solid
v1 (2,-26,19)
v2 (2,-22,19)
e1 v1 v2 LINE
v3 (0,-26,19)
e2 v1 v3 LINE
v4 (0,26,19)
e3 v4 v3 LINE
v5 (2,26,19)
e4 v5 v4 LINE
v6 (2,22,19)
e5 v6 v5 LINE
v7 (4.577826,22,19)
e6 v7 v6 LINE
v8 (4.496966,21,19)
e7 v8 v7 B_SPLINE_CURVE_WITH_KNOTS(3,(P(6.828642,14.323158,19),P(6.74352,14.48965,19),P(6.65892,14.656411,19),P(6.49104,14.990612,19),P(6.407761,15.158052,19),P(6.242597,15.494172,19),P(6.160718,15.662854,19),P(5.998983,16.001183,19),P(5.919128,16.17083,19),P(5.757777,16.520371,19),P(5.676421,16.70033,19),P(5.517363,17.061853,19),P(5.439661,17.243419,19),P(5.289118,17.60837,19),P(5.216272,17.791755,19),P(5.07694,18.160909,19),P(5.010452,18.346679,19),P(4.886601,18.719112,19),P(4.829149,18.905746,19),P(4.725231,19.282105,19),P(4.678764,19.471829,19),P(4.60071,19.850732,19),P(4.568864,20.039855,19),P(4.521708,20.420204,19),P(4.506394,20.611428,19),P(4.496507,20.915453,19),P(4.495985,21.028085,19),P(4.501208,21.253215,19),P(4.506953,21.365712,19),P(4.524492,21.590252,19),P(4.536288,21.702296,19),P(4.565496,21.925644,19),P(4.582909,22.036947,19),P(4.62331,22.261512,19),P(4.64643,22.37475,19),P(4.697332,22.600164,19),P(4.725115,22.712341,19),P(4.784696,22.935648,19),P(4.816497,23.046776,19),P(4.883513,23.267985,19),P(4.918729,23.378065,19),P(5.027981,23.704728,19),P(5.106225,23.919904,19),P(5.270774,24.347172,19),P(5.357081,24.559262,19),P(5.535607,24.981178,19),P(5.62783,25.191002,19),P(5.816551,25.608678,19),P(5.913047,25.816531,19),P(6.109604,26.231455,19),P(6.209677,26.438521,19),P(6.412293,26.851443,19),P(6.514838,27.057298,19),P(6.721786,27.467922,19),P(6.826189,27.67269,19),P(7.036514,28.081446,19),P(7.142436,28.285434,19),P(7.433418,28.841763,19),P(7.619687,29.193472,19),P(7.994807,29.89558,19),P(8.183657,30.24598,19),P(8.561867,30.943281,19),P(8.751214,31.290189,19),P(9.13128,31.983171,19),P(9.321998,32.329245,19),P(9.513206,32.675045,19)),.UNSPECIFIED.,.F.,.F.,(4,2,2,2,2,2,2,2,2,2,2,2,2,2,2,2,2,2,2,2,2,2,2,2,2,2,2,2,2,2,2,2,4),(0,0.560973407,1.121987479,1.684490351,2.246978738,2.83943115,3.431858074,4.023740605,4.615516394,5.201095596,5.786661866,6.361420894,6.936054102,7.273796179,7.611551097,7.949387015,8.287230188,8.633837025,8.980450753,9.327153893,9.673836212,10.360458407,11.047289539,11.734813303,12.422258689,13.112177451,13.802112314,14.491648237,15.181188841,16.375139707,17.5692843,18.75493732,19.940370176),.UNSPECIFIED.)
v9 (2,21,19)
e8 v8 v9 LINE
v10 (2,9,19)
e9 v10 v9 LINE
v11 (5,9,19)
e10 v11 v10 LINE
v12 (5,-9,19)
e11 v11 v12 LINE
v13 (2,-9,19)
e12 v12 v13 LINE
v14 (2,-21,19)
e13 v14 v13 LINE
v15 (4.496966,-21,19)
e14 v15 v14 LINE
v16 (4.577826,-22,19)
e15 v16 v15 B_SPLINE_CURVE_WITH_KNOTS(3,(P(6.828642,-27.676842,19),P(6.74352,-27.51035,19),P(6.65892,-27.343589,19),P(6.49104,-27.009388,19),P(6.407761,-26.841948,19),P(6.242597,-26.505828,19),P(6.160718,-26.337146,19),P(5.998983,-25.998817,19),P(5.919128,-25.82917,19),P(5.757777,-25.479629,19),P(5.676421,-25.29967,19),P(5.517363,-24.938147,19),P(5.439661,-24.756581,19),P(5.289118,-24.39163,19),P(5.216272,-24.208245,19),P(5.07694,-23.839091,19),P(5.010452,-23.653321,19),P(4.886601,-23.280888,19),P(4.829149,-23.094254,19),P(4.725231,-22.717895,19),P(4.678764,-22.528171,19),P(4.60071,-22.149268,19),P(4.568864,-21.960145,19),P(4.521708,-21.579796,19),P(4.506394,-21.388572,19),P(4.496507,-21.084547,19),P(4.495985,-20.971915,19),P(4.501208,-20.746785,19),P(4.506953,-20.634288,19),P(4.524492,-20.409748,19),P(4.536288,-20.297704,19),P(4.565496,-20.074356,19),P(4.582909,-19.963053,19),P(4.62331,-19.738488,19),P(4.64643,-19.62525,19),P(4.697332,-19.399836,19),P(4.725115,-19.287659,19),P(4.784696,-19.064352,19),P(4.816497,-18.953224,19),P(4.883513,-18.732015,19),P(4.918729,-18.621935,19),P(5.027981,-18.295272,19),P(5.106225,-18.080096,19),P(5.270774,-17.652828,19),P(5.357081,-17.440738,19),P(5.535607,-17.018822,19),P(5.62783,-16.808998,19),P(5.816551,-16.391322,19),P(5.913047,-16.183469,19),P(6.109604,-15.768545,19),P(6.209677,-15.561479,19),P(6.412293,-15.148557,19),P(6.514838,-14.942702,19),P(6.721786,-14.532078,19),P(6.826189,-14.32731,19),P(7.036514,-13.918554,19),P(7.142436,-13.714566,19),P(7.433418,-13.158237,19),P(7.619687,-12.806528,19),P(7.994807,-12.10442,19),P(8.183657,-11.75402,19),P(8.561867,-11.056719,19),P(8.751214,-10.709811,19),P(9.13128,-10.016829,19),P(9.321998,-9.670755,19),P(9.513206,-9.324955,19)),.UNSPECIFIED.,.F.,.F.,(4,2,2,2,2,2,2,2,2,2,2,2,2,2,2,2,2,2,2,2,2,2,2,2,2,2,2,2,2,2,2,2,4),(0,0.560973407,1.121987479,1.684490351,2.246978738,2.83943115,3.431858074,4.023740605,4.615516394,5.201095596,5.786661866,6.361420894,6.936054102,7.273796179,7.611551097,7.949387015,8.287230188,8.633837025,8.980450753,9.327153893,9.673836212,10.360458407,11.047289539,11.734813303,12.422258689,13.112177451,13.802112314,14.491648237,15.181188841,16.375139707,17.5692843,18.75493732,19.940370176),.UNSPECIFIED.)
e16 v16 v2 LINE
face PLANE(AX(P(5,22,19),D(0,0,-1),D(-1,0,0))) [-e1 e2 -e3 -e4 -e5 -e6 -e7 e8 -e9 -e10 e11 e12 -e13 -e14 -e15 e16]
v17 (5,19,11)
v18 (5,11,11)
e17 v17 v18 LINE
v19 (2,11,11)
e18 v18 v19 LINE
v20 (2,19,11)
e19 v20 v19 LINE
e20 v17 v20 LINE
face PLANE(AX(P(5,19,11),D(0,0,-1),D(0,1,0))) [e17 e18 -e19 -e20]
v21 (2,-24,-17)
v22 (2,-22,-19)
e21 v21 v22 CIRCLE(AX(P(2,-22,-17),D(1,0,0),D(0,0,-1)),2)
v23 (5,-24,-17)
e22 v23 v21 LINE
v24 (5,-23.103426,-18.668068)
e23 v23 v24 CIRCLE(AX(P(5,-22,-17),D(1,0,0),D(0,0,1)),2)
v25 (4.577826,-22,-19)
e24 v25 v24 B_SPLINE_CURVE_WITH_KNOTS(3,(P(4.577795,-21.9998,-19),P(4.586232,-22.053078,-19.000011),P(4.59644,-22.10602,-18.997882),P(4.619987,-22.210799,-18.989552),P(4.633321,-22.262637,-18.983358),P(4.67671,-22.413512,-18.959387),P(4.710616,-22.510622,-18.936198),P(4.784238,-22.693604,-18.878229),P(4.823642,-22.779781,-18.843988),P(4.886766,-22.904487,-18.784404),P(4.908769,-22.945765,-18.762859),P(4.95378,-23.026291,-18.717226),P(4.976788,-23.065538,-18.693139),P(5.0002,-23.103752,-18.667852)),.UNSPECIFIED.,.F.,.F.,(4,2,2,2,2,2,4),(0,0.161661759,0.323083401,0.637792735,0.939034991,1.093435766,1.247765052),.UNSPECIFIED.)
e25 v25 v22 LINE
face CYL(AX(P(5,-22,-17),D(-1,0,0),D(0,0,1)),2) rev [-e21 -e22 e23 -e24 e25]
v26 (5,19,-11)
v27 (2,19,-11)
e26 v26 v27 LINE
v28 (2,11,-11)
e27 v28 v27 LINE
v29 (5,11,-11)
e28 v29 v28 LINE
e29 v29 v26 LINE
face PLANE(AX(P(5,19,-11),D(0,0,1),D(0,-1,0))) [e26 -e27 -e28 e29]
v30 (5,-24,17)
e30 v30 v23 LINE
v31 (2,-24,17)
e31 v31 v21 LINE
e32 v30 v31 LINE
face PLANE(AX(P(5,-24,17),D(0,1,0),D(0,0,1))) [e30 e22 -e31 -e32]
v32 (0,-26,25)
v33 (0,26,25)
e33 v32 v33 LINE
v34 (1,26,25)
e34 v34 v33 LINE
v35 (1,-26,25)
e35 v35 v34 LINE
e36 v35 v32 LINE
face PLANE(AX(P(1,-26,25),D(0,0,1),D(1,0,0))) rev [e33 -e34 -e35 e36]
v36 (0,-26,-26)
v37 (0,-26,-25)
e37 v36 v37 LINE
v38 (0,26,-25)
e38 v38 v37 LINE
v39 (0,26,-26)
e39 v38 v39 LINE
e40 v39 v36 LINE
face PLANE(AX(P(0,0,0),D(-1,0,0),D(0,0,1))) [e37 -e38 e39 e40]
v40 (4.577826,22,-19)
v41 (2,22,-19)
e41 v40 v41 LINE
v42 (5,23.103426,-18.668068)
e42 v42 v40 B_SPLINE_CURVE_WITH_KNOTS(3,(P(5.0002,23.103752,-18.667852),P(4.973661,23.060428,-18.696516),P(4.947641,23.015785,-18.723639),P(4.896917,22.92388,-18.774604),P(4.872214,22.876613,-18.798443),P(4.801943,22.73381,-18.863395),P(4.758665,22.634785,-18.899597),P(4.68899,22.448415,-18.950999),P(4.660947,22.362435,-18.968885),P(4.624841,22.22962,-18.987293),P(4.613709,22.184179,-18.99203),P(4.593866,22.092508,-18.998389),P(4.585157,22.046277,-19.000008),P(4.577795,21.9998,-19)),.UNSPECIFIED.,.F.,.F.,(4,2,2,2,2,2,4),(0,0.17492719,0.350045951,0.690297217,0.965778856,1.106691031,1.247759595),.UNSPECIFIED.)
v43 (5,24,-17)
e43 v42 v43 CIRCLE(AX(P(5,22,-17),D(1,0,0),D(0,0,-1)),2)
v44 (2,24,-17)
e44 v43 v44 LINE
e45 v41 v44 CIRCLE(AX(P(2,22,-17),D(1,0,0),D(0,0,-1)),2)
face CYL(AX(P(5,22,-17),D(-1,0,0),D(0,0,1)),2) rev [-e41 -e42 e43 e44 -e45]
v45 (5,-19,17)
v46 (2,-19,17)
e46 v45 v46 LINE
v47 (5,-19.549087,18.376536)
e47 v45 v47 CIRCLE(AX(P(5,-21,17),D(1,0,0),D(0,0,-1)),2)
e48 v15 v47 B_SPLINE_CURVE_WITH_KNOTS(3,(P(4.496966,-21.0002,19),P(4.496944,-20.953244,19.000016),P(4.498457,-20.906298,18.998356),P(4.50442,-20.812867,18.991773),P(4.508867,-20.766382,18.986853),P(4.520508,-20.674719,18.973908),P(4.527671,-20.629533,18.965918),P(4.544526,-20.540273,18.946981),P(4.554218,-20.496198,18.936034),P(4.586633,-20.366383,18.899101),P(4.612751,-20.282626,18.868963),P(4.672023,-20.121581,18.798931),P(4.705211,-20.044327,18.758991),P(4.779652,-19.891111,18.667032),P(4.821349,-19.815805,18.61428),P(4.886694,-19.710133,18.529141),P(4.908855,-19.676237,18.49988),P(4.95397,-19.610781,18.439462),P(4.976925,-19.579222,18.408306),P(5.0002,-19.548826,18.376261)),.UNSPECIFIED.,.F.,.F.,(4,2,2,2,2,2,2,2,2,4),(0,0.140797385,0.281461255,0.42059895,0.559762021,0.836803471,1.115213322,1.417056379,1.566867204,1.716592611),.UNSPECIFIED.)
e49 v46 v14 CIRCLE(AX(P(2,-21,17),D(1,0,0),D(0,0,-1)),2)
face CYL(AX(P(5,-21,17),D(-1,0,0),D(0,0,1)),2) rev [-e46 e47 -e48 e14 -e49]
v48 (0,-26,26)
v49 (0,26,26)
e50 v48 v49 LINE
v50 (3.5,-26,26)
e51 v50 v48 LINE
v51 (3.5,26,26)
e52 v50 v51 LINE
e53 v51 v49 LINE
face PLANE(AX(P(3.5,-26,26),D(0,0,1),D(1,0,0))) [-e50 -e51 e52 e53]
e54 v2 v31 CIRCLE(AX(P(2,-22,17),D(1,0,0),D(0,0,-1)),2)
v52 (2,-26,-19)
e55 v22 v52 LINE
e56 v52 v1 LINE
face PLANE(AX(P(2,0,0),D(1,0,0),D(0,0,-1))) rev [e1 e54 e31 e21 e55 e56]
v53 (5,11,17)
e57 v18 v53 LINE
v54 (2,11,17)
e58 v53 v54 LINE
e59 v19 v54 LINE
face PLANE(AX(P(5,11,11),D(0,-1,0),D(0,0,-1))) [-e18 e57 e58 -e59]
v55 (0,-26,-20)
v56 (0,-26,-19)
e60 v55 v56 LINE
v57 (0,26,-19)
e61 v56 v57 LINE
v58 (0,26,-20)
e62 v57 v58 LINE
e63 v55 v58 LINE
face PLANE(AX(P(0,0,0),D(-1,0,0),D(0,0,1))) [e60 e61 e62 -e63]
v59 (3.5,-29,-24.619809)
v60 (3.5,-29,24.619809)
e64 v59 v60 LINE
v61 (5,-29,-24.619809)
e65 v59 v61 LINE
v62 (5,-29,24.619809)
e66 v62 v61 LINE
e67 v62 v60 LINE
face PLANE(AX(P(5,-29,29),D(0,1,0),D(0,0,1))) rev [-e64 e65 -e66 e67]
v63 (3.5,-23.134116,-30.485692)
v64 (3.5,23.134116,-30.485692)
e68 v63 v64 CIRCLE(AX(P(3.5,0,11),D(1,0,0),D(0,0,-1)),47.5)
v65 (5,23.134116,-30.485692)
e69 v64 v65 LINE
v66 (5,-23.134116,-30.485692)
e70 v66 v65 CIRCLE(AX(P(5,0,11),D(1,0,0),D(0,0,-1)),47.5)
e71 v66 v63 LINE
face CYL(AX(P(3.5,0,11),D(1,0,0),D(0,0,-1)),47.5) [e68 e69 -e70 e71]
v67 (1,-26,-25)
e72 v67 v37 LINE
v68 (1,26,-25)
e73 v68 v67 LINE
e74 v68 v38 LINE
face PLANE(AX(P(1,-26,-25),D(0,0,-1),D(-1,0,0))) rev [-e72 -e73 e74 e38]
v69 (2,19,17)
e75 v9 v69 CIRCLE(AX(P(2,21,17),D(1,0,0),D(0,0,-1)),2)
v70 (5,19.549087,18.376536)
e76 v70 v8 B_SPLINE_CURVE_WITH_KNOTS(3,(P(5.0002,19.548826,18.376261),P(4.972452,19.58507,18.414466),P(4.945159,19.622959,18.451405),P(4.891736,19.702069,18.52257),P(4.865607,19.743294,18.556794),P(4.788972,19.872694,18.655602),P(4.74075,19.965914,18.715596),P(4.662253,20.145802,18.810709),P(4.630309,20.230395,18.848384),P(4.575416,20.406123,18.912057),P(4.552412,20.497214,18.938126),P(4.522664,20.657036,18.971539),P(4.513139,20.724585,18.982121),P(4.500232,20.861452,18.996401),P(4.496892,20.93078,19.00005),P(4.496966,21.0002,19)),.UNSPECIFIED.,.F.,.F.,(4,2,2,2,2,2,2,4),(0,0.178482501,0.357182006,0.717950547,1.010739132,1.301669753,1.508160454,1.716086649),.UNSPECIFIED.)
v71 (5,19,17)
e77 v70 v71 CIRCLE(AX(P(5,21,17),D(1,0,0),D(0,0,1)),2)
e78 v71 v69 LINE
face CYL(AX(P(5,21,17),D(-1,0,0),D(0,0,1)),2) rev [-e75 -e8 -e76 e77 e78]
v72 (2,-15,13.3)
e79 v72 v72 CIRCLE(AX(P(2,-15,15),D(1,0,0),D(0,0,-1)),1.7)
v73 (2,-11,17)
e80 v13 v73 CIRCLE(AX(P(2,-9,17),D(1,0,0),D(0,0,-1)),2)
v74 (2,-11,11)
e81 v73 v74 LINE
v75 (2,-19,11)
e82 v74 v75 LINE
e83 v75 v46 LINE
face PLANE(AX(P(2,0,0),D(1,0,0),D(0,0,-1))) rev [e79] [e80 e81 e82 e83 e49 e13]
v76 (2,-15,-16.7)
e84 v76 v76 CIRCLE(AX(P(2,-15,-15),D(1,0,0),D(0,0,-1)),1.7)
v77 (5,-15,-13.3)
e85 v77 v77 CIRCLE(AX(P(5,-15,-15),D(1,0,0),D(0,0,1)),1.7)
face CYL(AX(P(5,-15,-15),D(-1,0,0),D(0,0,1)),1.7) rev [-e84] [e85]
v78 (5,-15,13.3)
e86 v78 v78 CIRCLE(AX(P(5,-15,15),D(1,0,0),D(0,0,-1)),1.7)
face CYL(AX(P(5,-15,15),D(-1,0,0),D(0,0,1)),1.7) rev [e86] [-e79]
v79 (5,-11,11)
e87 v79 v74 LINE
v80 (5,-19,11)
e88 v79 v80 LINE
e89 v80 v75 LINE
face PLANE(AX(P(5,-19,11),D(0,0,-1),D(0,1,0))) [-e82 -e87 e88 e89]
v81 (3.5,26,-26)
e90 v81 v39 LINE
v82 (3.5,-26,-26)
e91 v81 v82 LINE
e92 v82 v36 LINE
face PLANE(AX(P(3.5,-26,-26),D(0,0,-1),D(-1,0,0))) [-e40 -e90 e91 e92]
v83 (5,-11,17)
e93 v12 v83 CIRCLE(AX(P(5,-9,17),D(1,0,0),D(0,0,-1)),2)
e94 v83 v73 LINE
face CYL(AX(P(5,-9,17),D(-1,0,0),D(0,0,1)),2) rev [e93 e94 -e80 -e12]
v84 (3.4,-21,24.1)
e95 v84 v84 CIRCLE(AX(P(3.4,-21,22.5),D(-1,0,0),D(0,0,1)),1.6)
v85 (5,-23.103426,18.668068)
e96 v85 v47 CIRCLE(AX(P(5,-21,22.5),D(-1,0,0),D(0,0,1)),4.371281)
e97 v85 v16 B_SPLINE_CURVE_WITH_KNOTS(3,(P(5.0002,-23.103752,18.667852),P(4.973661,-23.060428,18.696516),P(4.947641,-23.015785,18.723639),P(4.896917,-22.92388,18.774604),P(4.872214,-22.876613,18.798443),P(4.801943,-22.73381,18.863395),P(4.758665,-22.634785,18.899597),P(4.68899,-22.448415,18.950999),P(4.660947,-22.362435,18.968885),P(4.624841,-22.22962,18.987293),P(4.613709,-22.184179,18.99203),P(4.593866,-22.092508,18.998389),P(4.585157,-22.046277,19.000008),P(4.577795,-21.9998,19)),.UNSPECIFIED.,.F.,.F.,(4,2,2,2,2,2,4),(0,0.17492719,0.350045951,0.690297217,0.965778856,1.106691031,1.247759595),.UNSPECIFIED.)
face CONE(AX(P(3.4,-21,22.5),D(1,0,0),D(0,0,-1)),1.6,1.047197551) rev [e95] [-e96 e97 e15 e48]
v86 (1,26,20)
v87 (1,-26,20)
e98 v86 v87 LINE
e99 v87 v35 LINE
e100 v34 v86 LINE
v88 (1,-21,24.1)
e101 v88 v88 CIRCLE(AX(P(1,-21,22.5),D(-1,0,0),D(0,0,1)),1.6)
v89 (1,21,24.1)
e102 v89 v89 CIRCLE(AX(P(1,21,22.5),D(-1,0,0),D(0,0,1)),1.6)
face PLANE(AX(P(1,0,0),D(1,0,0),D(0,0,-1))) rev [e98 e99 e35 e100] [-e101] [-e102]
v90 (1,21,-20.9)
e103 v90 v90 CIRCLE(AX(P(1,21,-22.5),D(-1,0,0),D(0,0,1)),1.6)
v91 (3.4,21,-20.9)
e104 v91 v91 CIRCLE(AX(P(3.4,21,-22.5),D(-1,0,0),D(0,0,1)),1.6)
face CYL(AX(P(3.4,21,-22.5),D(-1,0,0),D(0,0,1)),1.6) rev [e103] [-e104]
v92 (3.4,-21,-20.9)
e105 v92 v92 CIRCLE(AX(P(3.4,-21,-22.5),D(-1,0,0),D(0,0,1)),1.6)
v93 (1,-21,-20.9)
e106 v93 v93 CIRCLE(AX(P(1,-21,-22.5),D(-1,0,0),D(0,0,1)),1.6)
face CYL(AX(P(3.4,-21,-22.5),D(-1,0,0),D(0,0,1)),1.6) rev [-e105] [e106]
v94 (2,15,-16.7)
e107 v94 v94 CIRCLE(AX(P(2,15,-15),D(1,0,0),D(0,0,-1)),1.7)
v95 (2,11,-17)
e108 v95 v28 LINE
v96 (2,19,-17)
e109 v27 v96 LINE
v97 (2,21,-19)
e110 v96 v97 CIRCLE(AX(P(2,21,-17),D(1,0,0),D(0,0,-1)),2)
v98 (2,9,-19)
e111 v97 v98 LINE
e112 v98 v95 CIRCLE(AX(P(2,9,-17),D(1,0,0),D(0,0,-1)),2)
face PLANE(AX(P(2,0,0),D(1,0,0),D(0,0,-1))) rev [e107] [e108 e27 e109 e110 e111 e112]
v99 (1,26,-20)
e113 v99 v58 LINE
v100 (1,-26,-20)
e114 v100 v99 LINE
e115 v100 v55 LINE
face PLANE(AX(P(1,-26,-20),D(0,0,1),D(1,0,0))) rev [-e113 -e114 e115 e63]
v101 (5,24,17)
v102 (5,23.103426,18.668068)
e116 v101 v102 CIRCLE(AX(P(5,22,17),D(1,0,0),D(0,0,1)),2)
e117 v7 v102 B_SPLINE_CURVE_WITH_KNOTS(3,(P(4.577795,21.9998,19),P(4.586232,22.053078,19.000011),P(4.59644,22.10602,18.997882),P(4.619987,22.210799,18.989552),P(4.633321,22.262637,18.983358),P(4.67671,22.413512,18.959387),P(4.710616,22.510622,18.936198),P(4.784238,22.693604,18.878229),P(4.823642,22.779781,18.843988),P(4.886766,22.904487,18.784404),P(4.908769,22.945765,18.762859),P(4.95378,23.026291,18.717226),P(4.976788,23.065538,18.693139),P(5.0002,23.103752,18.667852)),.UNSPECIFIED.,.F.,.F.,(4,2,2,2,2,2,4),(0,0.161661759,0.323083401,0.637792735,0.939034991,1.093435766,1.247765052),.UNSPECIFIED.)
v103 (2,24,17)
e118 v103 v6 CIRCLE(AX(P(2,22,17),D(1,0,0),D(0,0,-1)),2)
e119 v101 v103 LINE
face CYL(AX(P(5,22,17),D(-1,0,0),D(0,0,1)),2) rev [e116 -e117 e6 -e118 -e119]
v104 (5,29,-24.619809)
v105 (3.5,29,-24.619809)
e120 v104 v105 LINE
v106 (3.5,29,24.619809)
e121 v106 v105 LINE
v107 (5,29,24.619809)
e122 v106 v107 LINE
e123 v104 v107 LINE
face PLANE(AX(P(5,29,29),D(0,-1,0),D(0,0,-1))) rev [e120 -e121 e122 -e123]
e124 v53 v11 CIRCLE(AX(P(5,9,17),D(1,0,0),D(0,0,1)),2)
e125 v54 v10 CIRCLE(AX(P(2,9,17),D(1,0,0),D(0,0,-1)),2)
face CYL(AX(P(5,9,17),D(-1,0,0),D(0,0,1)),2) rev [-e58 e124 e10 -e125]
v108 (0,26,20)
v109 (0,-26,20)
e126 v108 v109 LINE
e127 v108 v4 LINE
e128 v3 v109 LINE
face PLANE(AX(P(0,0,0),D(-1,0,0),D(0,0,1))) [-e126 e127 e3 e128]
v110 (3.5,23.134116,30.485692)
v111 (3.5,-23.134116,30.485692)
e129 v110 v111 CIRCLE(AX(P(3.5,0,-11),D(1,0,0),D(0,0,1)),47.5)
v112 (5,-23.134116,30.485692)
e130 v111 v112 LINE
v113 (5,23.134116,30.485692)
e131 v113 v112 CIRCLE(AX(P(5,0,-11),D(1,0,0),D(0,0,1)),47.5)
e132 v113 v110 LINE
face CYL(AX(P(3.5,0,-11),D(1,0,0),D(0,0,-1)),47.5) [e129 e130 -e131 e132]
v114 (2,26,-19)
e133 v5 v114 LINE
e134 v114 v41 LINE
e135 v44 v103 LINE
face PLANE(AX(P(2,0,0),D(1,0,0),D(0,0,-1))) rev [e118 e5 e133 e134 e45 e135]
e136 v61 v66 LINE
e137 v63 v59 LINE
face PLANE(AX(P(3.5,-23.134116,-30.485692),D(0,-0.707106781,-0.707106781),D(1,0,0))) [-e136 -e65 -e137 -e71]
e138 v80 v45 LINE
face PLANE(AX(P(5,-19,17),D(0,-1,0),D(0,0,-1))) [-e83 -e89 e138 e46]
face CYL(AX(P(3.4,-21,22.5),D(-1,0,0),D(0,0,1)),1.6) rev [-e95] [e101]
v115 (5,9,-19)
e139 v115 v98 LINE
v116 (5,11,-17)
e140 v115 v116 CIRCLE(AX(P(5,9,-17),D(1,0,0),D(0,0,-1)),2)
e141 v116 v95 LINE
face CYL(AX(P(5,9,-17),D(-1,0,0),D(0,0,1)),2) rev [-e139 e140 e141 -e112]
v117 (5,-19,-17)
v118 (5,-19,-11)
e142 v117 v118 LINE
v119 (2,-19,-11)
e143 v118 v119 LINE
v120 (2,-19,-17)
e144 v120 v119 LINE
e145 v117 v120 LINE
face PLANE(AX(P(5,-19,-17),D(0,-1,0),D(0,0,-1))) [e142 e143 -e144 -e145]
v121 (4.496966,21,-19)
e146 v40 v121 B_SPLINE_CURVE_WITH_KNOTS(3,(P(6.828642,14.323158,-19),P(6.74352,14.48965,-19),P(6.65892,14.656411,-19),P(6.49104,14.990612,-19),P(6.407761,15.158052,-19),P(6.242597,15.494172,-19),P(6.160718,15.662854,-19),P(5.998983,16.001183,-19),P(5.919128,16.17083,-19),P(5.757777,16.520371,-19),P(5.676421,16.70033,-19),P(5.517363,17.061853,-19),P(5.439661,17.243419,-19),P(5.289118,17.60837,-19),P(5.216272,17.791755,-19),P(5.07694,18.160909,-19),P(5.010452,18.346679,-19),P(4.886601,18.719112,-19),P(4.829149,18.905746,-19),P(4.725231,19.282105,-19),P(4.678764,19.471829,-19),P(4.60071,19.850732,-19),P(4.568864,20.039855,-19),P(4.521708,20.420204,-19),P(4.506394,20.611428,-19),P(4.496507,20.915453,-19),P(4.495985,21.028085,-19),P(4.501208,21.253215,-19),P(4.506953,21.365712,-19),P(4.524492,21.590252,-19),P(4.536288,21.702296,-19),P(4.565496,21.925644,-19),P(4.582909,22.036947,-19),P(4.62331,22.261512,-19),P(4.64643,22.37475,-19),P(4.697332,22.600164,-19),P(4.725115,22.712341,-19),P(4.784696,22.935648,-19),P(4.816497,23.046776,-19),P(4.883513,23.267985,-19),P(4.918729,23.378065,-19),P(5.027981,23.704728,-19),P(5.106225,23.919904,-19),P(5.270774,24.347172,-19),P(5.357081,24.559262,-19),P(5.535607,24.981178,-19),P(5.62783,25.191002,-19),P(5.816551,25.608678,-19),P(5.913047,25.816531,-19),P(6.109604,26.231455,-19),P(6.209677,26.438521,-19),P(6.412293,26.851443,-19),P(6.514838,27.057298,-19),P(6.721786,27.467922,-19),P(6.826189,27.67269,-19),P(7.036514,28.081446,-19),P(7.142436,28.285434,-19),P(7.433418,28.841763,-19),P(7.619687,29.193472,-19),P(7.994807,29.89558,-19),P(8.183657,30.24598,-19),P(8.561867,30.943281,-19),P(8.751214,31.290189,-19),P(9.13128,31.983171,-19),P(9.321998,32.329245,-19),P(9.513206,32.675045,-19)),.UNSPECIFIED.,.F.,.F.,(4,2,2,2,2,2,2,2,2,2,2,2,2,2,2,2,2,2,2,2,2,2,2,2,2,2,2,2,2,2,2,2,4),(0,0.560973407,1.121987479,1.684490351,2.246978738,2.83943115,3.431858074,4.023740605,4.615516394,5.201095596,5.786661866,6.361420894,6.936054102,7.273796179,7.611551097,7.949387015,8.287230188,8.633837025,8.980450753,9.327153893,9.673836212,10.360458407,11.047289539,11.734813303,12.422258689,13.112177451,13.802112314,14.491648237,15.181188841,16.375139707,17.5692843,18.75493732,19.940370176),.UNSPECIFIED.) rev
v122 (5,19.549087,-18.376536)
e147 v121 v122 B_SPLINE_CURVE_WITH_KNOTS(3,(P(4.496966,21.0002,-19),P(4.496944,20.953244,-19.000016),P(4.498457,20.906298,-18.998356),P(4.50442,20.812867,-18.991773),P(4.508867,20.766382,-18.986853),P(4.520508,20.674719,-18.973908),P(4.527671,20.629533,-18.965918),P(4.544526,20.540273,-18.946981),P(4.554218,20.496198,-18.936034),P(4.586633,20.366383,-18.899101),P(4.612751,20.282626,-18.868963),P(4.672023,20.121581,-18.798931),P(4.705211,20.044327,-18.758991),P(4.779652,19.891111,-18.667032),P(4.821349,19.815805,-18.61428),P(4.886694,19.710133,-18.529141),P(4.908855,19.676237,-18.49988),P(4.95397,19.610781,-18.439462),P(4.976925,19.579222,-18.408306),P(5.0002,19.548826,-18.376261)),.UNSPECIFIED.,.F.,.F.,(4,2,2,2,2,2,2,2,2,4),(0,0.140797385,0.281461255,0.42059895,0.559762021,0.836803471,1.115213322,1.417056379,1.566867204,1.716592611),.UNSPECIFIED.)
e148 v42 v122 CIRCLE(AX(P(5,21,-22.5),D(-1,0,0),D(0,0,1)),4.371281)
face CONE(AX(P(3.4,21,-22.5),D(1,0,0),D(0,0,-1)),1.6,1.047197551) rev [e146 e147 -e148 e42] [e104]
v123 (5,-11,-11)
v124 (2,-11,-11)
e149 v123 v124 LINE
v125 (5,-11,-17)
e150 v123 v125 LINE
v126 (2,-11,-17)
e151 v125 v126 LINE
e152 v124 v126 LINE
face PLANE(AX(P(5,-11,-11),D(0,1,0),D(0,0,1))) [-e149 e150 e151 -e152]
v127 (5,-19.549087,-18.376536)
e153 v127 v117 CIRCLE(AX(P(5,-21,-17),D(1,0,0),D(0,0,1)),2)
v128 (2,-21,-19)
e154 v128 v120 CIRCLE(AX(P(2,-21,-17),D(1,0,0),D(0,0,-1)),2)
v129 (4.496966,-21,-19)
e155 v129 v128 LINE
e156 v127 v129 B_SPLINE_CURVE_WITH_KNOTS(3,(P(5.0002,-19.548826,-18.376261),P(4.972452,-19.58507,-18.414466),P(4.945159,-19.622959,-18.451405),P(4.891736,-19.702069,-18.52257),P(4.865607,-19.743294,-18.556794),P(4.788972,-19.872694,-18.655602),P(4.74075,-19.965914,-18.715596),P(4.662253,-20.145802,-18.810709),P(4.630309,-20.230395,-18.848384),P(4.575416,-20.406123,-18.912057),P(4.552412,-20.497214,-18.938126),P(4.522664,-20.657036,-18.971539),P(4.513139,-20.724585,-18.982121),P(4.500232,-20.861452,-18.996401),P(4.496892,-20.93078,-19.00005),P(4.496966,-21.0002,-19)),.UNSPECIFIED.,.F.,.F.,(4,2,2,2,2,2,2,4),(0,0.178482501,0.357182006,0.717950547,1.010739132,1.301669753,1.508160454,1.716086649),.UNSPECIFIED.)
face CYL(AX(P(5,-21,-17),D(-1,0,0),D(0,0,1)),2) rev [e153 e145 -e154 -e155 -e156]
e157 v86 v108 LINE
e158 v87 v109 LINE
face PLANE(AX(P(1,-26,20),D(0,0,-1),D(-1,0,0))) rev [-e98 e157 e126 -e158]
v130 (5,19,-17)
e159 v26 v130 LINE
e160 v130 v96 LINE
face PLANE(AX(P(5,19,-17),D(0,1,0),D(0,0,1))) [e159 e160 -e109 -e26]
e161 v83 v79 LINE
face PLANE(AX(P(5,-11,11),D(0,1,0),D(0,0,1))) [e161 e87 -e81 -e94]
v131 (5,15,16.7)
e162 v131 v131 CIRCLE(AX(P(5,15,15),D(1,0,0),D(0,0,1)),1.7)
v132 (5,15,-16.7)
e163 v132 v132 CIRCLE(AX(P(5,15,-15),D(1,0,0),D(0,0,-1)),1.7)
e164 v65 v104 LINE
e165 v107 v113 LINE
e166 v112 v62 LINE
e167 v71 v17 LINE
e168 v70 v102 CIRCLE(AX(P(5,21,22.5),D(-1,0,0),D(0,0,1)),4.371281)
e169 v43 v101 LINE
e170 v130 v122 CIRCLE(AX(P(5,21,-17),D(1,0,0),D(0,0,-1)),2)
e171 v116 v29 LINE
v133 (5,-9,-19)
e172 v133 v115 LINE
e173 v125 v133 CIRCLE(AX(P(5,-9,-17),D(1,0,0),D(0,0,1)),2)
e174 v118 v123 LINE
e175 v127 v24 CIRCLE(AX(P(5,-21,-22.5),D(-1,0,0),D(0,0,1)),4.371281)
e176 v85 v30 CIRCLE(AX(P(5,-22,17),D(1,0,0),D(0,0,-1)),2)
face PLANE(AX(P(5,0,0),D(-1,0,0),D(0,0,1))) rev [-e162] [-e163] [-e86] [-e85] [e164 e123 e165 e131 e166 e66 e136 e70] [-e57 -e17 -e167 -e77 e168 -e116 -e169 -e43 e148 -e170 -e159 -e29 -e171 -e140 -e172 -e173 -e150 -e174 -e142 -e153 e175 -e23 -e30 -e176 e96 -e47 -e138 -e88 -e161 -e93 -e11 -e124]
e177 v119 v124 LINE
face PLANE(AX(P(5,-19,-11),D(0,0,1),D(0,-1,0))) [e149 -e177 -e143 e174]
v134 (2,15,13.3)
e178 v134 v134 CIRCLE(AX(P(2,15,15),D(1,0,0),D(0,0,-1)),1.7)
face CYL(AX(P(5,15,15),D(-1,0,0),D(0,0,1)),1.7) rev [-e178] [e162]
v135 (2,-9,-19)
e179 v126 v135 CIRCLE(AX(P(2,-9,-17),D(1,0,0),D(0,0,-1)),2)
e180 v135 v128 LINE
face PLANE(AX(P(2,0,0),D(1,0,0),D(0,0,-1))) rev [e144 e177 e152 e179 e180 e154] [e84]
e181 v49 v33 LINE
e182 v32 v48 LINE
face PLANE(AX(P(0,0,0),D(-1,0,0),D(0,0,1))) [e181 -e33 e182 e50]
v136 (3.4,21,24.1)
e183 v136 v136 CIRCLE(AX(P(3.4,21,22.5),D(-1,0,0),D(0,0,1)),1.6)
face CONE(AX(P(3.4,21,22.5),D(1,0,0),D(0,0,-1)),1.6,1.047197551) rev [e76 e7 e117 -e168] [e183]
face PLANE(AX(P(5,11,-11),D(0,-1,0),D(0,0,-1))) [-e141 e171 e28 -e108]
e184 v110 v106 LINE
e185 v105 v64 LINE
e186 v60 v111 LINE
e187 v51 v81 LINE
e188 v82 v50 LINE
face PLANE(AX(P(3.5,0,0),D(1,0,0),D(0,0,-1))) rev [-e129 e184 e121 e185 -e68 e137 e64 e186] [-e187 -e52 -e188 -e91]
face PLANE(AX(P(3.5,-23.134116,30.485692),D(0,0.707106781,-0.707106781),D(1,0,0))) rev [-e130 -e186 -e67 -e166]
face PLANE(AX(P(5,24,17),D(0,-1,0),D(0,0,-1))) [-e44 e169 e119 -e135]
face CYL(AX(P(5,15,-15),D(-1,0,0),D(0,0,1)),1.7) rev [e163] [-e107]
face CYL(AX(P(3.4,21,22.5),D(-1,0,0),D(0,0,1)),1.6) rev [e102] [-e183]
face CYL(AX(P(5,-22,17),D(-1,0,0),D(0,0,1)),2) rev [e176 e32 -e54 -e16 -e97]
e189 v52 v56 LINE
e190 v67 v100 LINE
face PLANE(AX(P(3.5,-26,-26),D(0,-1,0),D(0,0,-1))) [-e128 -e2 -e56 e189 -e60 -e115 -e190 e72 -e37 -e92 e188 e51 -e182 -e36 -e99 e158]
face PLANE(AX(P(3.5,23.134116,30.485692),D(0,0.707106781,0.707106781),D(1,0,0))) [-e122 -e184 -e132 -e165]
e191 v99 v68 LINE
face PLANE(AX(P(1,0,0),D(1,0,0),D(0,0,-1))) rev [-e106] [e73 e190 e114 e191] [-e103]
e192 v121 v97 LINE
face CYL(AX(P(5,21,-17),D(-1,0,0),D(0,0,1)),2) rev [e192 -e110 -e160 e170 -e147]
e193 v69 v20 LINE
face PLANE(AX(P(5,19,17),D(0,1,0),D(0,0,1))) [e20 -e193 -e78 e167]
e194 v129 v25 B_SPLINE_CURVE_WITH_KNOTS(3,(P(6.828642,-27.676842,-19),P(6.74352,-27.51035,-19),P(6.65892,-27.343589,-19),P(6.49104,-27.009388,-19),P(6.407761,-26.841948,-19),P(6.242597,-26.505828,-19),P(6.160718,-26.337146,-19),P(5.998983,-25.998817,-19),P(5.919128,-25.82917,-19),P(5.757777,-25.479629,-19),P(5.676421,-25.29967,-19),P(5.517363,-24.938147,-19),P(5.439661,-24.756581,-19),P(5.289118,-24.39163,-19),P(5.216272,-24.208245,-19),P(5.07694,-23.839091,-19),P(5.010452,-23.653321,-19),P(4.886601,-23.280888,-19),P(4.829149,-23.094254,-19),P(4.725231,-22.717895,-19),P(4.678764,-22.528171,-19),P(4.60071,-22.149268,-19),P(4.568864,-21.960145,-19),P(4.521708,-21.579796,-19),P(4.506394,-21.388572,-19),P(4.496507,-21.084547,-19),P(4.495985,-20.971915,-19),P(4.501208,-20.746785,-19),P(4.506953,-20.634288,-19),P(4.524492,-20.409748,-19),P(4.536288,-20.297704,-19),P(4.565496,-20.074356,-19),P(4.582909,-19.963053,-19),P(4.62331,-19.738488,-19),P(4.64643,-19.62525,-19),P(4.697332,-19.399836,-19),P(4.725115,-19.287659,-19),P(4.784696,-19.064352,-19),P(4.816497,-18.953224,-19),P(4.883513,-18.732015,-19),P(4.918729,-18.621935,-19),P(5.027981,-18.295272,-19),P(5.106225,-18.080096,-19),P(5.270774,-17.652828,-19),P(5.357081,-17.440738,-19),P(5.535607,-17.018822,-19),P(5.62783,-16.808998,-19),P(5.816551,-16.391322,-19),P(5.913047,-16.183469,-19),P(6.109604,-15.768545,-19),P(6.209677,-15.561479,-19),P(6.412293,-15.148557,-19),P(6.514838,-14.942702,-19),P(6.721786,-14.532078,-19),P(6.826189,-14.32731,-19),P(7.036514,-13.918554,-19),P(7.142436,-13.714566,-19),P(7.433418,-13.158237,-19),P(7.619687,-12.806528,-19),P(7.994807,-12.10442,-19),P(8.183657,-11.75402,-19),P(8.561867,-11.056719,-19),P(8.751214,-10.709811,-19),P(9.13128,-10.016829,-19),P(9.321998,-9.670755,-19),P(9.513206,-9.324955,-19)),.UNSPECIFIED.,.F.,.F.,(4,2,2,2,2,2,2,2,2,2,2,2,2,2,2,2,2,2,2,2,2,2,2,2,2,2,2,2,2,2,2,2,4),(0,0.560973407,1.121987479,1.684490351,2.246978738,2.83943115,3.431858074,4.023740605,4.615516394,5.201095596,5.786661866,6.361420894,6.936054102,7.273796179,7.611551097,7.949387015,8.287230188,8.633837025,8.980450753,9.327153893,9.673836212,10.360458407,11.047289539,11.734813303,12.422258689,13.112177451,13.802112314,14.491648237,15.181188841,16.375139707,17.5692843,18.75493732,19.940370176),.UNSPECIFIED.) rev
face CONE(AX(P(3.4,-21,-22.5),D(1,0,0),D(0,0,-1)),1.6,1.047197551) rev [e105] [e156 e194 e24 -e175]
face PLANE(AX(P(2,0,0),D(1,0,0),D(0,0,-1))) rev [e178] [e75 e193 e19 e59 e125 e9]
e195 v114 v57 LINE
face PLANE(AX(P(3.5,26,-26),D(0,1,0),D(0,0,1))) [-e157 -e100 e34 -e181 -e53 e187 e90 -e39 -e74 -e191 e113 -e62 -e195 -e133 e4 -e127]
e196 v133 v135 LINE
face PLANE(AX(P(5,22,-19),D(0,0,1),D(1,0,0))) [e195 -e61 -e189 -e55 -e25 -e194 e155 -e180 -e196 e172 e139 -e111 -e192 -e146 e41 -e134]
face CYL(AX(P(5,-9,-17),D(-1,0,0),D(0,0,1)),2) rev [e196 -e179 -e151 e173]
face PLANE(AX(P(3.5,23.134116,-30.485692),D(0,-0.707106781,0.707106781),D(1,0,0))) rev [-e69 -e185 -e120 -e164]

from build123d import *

# Parameters (mm, degrees)
SKETCH_1_W                  = 58
SKETCH_1_H                  = 58
SKETCH_1_R                  = 1.7
EXTRUDE_1_DEPTH             = 5
SKETCH_2_W                  = 58
SKETCH_2_H                  = 58
SKETCH_2_W_2                = 52
SKETCH_2_H_2                = 52
CUT_EXTRUDE_1_DEPTH         = 3.5
SKETCH_3_W                  = 38
SKETCH_3_H                  = 52
CUT_EXTRUDE_2_DEPTH         = 2
SKETCH_4_W                  = 5
SKETCH_4_H                  = 52
CUT_EXTRUDE_3_DEPTH         = 1
SKETCH_8_R                  = 1.6
CUT_EXTRUDE_4_DEPTH         = 2.4
PATTERN_LINEAR_1_COUNT      = 2
PATTERN_LINEAR_1_PITCH      = 45
PATTERN_LINEAR_1_COUNT_DIR2 = 2
PATTERN_LINEAR_1_PITCH_DIR2 = 42
EXTRUDE_2_DEPTH             = 1.5
SKETCH_12_R                 = 63.004873171
CUT_EXTRUDE_6_DEPTH         = 1.5
CHAMFER_2_SIZE              = 2
CHAMFER_3_SIZE              = 2
CHAMFER_5_SIZE              = 2
CHAMFER_6_SIZE              = 2


with BuildPart() as part:
    # 草图1 → 凸台-拉伸1 (new body)
    with BuildSketch(Plane(origin=(0, 0, 0), x_dir=(0, 0, -1), z_dir=(1, 0, 0))):
        Rectangle(SKETCH_1_W, SKETCH_1_H)
        with Locations((15, 15)):
            Circle(SKETCH_1_R, mode=Mode.SUBTRACT)
        with Locations(Location((-15, 15, 0), (0, 0, 180))):
            Circle(SKETCH_1_R, mode=Mode.SUBTRACT)
        with Locations((-15, -15)):
            Circle(SKETCH_1_R, mode=Mode.SUBTRACT)
        with Locations(Location((15, -15, 0), (0, 0, 180))):
            Circle(SKETCH_1_R, mode=Mode.SUBTRACT)
        with BuildLine():
            Line((-17, 24), (17, 24))
            ThreePointArc((17, 24), (18.414213562, 23.414213562), (19, 22))
            Line((19, 22), (19, 21))
            ThreePointArc((19, 21), (18.414213562, 19.585786438), (17, 19))
            Line((17, 19), (11, 19))
            Line((11, 19), (11, 11))
            Line((11, 11), (17, 11))
            ThreePointArc((17, 11), (18.414213562, 10.414213562), (19, 9))
            Line((19, 9), (19, -9))
            ThreePointArc((19, -9), (18.414213562, -10.414213562), (17, -11))
            Line((17, -11), (11, -11))
            Line((11, -11), (11, -19))
            Line((11, -19), (17, -19))
            ThreePointArc((17, -19), (18.414213562, -19.585786438), (19, -21))
            Line((19, -21), (19, -22))
            ThreePointArc((19, -22), (18.414213562, -23.414213562), (17, -24))
            Line((17, -24), (-17, -24))
            ThreePointArc((-17, -24), (-18.414213562, -23.414213562), (-19, -22))
            Line((-19, -22), (-19, -21))
            ThreePointArc((-19, -21), (-18.414213562, -19.585786438), (-17, -19))
            Line((-17, -19), (-11, -19))
            Line((-11, -19), (-11, -11))
            Line((-11, -11), (-17, -11))
            ThreePointArc((-17, -11), (-18.414213562, -10.414213562), (-19, -9))
            Line((-19, -9), (-19, 9))
            ThreePointArc((-19, 9), (-18.414213562, 10.414213562), (-17, 11))
            Line((-17, 11), (-11, 11))
            Line((-11, 11), (-11, 19))
            Line((-11, 19), (-17, 19))
            ThreePointArc((-17, 19), (-18.414213562, 19.585786438), (-19, 21))
            Line((-19, 21), (-19, 22))
            ThreePointArc((-19, 22), (-18.414213562, 23.414213562), (-17, 24))
        make_face(mode=Mode.SUBTRACT)
    extrude(amount=EXTRUDE_1_DEPTH)

    # 草图2 → 切除-拉伸1 (cut)
    with BuildSketch(Plane.ZY):
        Rectangle(SKETCH_2_W, SKETCH_2_H)
        Rectangle(SKETCH_2_W_2, SKETCH_2_H_2, mode=Mode.SUBTRACT)
    extrude(amount=-CUT_EXTRUDE_1_DEPTH, mode=Mode.SUBTRACT)

    # 草图3 → 切除-拉伸2 (cut)
    with BuildSketch(Plane.ZY):
        Rectangle(SKETCH_3_W, SKETCH_3_H)
    extrude(amount=-CUT_EXTRUDE_2_DEPTH, mode=Mode.SUBTRACT)

    # 草图4 → 切除-拉伸3 (cut)
    with BuildSketch(Plane.ZY):
        with Locations((-22.5, 0)):
            Rectangle(SKETCH_4_W, SKETCH_4_H)
        with Locations((22.5, 0)):
            Rectangle(SKETCH_4_W, SKETCH_4_H)
    extrude(amount=-CUT_EXTRUDE_3_DEPTH, mode=Mode.SUBTRACT)

    # 草图8 → 切除-拉伸4 (cut)
    with BuildSketch(Plane.ZY.offset(-1)):
        with Locations((22.5, 21)):
            Circle(SKETCH_8_R)
    cut_extrude_4 = extrude(amount=-CUT_EXTRUDE_4_DEPTH, mode=Mode.SUBTRACT)

    # 草图9 → 切除-旋转2 (revolve, cut)
    with BuildSketch(Plane.XY.offset(22.5), mode=Mode.PRIVATE) as cut_revolve_2_sk:
        Polygon((3.4, 19.4), (3.4, 21), (5, 21), (5, 16.628718708), align=None)
    cut_revolve_2 = revolve(cut_revolve_2_sk.sketch.rotate(Axis((3.417252413, 21, 22.5), (1, 0, 0)), 90), axis=Axis((3.417252413, 21, 22.5), (1, 0, 0)), mode=Mode.SUBTRACT)

    # 阵列(线性)1: 切除-拉伸4, Cut-Revolve 2 2 × 2
    with Locations(*[(0, -j * PATTERN_LINEAR_1_PITCH_DIR2, -i * PATTERN_LINEAR_1_PITCH) for i in range(PATTERN_LINEAR_1_COUNT) for j in range(PATTERN_LINEAR_1_COUNT_DIR2) if (i, j) != (0, 0)]):
        add(cut_extrude_4, mode=Mode.SUBTRACT)
        add(cut_revolve_2, mode=Mode.SUBTRACT)

    # 草图10 → 凸台-拉伸2 (add)
    with BuildSketch(Plane(origin=(5, 0, 0), x_dir=(0, 0, -1), z_dir=(1, 0, 0))):
        with BuildLine():
            Line((-29, 25.617376915), (-29, -25.617376915))
            ThreePointArc((-29, -25.617376915), (-36.5, 0), (-29, 25.617376915))
        make_face()
        with BuildLine():
            Line((29, 25.617376915), (29, -25.617376915))
            ThreePointArc((29, -25.617376915), (36.5, 0), (29, 25.617376915))
        make_face()
    extrude(amount=-EXTRUDE_2_DEPTH)

    # 草图12 → 切除-拉伸6 (cut)
    with BuildSketch(Plane(origin=(5, 0, 0), x_dir=(0, 0, -1), z_dir=(1, 0, 0))):
        Circle(SKETCH_12_R)
        with BuildLine():
            ThreePointArc((0, -46.208765402), (36.5, 0), (0, 46.208765402))
            ThreePointArc((0, 46.208765402), (-36.5, 0), (0, -46.208765402))
        make_face(mode=Mode.SUBTRACT)
    extrude(amount=-CUT_EXTRUDE_6_DEPTH, mode=Mode.SUBTRACT)

    # 倒角2
    # the kernel refuses this chamfer: 11.02112637, 2 mm, written as the material it takes off along each edge
    with BuildSketch(Plane(origin=(-15.143908505, 29, 26.619808612), x_dir=(0, 0, -1), z_dir=(1, 0, 0))) as chamfer_2_piece_1:
        with BuildLine():
            Line((CHAMFER_2_SIZE, 0), (-3.865883602, -5.865883602))
            ThreePointArc((-3.865883602, -5.865883602), (-2.160150245, -3.0422483), (0, 0))
            Line((0, 0), (CHAMFER_2_SIZE, 0))
        make_face()
    extrude(amount=38.787817011, mode=Mode.SUBTRACT)

    # 倒角3
    # the kernel refuses this chamfer: 11.02112637, 2 mm, written as the material it takes off along each edge
    with BuildSketch(Plane(origin=(-15.143908505, 29, -26.619808612), x_dir=(0, 0, 1), z_dir=(1, 0, 0))) as chamfer_3_piece_1:
        with BuildLine():
            Line((CHAMFER_3_SIZE, 0), (-3.865883602, 5.865883602))
            ThreePointArc((-3.865883602, 5.865883602), (-2.160150245, 3.0422483), (0, 0))
            Line((0, 0), (CHAMFER_3_SIZE, 0))
        make_face()
    extrude(amount=38.787817011, mode=Mode.SUBTRACT)

    # 倒角5
    # the kernel refuses this chamfer: 11.02112637, 2 mm, written as the material it takes off along each edge
    with BuildSketch(Plane(origin=(-15.143908505, -29, -26.619808612), x_dir=(0, 0, 1), z_dir=(1, 0, 0))) as chamfer_5_piece_1:
        with BuildLine():
            Line((CHAMFER_5_SIZE, 0), (-3.865883602, -5.865883602))
            ThreePointArc((-3.865883602, -5.865883602), (-2.160150245, -3.0422483), (0, 0))
            Line((0, 0), (CHAMFER_5_SIZE, 0))
        make_face()
    extrude(amount=38.787817011, mode=Mode.SUBTRACT)

    # 倒角6
    # the kernel refuses this chamfer: 11.02112637, 2 mm, written as the material it takes off along each edge
    with BuildSketch(Plane(origin=(-15.143908505, -29, 26.619808612), x_dir=(0, 0, -1), z_dir=(1, 0, 0))) as chamfer_6_piece_1:
        with BuildLine():
            Line((CHAMFER_6_SIZE, 0), (-3.865883602, 5.865883602))
            ThreePointArc((-3.865883602, 5.865883602), (-2.160150245, 3.0422483), (0, 0))
            Line((0, 0), (CHAMFER_6_SIZE, 0))
        make_face()
    extrude(amount=38.787817011, mode=Mode.SUBTRACT)


solid = part.part
